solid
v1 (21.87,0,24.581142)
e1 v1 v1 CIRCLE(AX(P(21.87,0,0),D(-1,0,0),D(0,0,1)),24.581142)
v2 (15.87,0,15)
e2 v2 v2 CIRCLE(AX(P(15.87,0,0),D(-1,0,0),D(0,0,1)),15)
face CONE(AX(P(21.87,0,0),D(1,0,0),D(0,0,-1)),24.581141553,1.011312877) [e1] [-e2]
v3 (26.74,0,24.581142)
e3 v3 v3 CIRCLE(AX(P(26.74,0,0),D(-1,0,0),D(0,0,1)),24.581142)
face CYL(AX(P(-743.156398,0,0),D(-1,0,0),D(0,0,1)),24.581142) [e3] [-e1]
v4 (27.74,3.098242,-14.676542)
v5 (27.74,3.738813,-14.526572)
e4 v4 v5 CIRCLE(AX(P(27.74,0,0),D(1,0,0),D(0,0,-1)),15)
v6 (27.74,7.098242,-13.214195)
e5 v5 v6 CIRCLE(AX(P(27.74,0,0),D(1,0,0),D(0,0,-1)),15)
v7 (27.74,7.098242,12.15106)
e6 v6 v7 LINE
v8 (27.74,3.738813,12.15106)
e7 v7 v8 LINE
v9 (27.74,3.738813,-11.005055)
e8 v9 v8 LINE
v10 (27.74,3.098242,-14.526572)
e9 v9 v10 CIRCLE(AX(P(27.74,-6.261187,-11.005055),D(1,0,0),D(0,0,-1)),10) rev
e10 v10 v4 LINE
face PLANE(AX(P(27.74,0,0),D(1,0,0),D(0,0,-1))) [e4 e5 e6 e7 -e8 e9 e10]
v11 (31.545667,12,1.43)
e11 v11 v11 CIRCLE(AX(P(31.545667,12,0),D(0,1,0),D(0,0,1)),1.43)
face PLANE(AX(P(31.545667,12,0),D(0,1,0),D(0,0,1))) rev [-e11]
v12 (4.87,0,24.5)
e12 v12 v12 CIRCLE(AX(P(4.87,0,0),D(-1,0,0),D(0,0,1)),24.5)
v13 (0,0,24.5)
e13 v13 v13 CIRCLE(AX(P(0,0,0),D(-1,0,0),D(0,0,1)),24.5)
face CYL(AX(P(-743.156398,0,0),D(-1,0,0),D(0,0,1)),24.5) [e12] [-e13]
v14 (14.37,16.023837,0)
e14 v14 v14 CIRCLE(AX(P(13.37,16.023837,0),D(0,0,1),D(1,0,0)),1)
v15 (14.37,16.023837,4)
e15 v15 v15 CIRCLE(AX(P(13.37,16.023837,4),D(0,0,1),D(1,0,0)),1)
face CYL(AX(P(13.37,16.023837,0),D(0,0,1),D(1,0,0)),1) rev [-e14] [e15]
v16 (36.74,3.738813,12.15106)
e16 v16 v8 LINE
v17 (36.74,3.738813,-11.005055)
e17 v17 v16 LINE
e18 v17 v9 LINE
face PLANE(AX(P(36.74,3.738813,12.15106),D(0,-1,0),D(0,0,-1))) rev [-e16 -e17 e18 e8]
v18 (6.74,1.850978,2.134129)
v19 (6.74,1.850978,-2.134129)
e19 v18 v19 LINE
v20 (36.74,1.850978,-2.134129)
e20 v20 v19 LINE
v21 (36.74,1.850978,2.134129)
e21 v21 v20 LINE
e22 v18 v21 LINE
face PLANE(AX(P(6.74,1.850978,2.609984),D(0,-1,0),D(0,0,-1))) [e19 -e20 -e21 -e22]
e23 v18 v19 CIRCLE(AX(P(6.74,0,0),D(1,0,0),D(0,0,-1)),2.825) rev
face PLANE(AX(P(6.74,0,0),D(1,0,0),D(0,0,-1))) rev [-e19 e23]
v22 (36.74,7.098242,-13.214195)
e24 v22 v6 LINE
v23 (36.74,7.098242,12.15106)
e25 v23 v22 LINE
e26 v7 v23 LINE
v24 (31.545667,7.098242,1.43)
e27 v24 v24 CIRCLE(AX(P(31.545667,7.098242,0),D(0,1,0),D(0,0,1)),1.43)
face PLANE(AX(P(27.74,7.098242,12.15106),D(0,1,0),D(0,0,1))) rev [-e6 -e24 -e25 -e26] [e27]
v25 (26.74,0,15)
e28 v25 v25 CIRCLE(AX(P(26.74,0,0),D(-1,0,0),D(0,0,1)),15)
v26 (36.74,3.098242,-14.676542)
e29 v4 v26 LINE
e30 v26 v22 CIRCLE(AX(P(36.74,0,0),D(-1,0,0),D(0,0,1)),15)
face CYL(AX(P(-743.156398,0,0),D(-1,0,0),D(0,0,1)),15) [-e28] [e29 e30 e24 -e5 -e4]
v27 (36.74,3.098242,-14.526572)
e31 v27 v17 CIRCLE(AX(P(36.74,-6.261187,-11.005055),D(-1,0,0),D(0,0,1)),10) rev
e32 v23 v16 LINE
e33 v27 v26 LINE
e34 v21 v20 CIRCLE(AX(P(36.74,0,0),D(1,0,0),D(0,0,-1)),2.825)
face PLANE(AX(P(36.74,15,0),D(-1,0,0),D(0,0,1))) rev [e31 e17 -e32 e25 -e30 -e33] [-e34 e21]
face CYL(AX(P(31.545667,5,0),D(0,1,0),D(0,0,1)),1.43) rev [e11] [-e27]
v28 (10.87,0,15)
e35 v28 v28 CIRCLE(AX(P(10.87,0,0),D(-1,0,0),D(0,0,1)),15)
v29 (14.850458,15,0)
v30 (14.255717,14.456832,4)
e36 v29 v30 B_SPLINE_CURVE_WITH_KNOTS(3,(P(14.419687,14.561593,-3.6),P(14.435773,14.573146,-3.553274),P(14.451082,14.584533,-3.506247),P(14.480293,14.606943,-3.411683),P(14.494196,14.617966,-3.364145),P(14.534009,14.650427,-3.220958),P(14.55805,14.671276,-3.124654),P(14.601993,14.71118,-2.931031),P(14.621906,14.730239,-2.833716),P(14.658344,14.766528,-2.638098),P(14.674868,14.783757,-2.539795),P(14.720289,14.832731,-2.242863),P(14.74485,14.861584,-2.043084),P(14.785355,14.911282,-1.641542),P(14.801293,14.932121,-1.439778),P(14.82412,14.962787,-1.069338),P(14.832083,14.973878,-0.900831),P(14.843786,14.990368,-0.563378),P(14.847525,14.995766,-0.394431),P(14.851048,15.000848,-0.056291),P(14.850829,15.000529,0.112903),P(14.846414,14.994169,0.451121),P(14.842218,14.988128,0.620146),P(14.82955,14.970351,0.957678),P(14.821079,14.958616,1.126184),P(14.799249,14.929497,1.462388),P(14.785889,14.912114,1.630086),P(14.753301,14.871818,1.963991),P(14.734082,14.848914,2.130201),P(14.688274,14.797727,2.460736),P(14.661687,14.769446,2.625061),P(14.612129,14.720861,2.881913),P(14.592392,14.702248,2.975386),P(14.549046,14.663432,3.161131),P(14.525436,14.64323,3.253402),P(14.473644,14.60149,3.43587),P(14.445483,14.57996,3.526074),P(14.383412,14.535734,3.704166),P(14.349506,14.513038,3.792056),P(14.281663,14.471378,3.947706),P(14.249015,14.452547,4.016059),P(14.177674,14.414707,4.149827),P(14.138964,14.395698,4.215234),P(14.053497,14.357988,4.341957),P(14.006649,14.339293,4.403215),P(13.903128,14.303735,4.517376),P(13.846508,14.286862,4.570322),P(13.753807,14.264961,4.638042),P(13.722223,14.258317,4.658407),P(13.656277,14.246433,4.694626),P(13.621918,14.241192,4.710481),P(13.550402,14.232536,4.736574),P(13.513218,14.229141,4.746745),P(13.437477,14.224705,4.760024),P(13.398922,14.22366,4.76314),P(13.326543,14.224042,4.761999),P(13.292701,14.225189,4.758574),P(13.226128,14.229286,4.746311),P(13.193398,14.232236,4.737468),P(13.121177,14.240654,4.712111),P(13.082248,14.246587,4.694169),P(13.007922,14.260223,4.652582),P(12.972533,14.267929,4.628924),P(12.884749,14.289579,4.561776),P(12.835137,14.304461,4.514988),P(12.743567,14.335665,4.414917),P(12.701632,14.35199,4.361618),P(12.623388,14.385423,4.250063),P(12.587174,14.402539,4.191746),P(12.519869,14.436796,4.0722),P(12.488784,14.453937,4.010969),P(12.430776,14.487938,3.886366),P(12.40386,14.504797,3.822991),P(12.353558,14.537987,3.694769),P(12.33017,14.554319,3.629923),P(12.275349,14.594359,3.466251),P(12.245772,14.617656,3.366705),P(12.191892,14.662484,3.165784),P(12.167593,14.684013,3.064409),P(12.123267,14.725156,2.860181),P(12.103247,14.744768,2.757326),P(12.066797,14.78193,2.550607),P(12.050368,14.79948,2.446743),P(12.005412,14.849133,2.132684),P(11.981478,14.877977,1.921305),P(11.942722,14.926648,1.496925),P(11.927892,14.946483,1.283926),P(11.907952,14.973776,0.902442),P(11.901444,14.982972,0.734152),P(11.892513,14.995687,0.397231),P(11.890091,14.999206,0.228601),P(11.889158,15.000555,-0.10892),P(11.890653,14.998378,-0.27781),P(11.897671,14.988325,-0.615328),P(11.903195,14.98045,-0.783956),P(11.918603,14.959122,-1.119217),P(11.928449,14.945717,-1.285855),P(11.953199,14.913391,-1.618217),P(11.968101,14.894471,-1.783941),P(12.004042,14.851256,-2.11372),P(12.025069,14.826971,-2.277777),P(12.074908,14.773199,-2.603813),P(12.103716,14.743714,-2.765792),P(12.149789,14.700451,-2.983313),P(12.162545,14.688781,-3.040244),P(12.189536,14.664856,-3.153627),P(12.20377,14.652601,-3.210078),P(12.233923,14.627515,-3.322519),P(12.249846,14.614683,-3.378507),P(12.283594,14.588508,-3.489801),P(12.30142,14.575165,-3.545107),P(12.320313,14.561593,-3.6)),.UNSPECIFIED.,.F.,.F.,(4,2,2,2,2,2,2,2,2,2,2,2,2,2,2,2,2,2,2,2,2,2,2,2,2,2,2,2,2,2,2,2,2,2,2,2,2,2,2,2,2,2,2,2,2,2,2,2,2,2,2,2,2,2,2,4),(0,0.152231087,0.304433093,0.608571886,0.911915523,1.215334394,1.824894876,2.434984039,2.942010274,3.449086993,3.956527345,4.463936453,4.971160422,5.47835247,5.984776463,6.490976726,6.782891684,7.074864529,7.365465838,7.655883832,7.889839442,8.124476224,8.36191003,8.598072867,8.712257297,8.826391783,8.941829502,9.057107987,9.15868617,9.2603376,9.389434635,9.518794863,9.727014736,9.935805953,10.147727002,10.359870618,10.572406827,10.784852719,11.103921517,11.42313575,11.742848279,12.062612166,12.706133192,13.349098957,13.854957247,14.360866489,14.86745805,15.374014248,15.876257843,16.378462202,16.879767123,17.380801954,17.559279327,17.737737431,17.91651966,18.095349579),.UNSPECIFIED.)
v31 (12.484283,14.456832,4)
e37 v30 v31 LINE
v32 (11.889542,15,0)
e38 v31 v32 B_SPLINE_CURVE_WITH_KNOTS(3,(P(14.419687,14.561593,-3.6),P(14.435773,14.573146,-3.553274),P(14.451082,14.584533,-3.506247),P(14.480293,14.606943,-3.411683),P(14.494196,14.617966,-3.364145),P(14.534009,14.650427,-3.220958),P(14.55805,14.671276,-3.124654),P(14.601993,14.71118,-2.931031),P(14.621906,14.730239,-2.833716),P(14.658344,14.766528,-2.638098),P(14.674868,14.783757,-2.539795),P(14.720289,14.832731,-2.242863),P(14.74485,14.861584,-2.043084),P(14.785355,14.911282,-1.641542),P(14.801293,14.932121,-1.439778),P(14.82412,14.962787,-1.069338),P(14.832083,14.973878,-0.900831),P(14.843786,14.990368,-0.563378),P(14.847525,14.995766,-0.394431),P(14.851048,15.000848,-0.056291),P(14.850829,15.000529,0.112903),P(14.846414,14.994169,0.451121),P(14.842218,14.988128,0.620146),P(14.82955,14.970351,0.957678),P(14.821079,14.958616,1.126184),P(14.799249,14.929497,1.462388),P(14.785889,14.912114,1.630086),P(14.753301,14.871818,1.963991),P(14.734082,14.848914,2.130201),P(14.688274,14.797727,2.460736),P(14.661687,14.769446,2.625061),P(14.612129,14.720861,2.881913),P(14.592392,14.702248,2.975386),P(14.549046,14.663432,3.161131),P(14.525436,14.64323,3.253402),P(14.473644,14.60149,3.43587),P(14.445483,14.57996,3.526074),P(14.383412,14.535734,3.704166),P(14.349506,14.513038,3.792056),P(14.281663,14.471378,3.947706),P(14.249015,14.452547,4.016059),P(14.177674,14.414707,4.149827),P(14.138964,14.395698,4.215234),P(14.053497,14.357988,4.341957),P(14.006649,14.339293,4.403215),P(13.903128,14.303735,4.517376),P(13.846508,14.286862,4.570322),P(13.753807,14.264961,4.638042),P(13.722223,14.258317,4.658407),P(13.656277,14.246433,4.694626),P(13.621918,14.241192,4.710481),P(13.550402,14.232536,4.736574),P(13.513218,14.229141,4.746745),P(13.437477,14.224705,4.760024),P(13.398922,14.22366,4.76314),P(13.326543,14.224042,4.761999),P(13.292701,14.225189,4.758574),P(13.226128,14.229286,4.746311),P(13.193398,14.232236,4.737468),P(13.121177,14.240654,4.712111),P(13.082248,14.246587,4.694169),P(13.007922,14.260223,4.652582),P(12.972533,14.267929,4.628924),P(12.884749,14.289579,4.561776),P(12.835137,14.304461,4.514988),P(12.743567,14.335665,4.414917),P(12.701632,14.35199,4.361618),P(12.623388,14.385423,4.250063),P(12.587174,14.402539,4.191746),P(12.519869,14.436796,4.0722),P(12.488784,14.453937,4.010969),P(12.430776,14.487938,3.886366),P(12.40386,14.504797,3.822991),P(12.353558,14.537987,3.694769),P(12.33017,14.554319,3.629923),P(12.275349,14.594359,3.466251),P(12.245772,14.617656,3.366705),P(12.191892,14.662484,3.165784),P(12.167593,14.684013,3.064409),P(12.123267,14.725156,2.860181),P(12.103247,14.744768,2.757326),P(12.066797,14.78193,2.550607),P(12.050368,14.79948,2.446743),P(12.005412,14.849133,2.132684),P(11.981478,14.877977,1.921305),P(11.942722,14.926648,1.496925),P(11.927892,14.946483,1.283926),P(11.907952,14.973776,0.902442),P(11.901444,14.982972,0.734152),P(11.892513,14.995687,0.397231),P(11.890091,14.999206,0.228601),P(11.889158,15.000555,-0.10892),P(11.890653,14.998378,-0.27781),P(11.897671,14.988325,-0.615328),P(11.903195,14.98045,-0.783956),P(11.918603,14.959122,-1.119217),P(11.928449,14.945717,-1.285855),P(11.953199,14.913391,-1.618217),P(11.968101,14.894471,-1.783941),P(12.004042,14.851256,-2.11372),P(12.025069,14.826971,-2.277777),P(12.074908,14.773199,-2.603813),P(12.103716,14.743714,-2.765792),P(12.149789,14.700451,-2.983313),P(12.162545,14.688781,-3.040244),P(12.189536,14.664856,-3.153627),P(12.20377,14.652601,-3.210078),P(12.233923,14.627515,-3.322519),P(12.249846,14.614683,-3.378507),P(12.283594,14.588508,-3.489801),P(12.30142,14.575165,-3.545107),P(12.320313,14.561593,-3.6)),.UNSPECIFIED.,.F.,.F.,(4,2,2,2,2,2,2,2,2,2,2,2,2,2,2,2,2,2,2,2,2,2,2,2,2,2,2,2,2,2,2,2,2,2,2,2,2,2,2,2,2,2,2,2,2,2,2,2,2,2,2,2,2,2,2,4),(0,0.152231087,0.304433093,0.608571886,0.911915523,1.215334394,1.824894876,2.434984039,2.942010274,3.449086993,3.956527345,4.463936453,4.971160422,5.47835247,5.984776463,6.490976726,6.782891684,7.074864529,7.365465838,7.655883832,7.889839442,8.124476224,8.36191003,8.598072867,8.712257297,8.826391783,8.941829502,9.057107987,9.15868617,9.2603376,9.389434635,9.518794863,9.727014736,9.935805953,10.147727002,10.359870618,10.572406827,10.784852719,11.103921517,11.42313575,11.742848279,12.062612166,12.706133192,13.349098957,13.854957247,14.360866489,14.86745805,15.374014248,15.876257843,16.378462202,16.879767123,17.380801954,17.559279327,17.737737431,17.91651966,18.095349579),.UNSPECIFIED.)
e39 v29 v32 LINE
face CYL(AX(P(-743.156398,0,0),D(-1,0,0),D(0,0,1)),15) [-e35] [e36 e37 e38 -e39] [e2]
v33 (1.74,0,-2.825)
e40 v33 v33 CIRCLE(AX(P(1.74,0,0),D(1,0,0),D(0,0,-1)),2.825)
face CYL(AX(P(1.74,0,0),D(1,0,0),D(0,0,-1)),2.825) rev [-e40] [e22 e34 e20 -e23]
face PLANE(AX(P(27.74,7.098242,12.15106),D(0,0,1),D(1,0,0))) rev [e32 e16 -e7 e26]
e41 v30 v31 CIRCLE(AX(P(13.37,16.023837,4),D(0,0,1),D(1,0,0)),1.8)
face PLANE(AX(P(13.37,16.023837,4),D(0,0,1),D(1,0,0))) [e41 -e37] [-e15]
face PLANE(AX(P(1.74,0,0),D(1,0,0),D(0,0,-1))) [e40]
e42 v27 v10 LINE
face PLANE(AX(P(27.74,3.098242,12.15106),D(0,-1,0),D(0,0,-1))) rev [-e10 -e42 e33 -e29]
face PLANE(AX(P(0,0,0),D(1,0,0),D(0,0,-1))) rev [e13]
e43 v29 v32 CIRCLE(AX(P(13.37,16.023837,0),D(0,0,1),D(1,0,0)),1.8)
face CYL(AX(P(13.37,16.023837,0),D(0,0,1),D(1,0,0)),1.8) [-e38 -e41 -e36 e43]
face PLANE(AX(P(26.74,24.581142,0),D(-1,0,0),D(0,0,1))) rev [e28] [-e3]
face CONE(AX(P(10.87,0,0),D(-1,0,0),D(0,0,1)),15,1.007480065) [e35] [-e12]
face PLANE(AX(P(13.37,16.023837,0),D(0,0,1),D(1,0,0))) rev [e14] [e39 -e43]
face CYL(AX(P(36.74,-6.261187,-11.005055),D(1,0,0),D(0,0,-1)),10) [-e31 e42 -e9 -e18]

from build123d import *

# Parameters (mm, degrees)
SKETCH_3_R           = 2.825
CUT_EXTRUDE_2_DEPTH  = 35
SKETCH_16_W          = 5.008881277
SKETCH_16_H          = 1
EXTRUDE_2_DEPTH      = 30
SKETCH_19_W          = 0.959066555
SKETCH_19_H          = 0.511502163
EXTRUDE_3_DEPTH      = 30
SKETCH_24_W          = 26.827602514
SKETCH_24_H          = 4
CUT_EXTRUDE_8_DEPTH  = 9
EXTRUDE_1_DEPTH      = 2
EXTRUDE_1_DEPTH_BACK = 2
SKETCH_26_R          = 1.8
SKETCH_26_R_2        = 1
SKETCH_27_R          = 1.43
CUT_EXTRUDE_9_DEPTH  = 7
SKETCH_28_W          = 26.67763166
SKETCH_28_H          = 0.640570548
EXTRUDE_4_DEPTH      = 9
FILLET_1_R           = 10


with BuildPart() as part:
    # 草圖1 → 旋轉1 (revolve)
    with BuildSketch(Plane.XY, mode=Mode.PRIVATE) as revolve_1_sk:
        Polygon((0, 0), (0, 24.5), (4.87, 24.5), (10.87, 15), (15.87, 15), (21.87, 24.581141553), (26.74, 24.581141553), (26.74, 15), (36.74, 15), (36.74, 0), align=None)
    revolve(revolve_1_sk.sketch.rotate(Axis((-743.15639781, 0, 0), (1, 0, 0)), 90), axis=Axis((-743.15639781, 0, 0), (1, 0, 0)))

    # 草圖3 → 除料-伸長2 (cut)
    with BuildSketch(Plane(origin=(36.74, 0, 0), x_dir=(0, 0, -1), z_dir=(1, 0, 0))):
        Circle(SKETCH_3_R)
    extrude(amount=-CUT_EXTRUDE_2_DEPTH, mode=Mode.SUBTRACT)

    # 草圖16 → 填料-伸長2 (add)
    with BuildSketch(Plane(origin=(36.74, 0, 0), x_dir=(0, 0, -1), z_dir=(1, 0, 0))):
        with Locations((-0.105543204, 2.350977924)):
            Rectangle(SKETCH_16_W, SKETCH_16_H)
    extrude(amount=-EXTRUDE_2_DEPTH)

    # 草圖19 → 填料-伸長3 (add)
    with BuildSketch(Plane(origin=(36.74, 0, 0), x_dir=(0, 0, -1), z_dir=(1, 0, 0))):
        with Locations((-0.084116996, 2.673942601)):
            Rectangle(SKETCH_19_W, SKETCH_19_H)
    extrude(amount=-EXTRUDE_3_DEPTH)

    # 草圖24 → 除料-伸長8 (cut)
    with BuildSketch(Plane(origin=(36.74, 0, 0), x_dir=(0, 0, -1), z_dir=(1, 0, 0))):
        with Locations((1.262741112, 5.098242099)):
            Rectangle(SKETCH_24_W, SKETCH_24_H)
    extrude(amount=-CUT_EXTRUDE_8_DEPTH, mode=Mode.SUBTRACT)

    # 草圖26 → 伸長-薄件1 (add, two sides: drawn at the far end of the back side and taken through both)
    with BuildSketch(Plane.XY.offset(2).offset(-EXTRUDE_1_DEPTH_BACK)):
        with Locations((13.37, 16.023837481)):
            Circle(SKETCH_26_R)
        with Locations((13.37, 16.023837481)):
            Circle(SKETCH_26_R_2, mode=Mode.SUBTRACT)
    extrude(amount=EXTRUDE_1_DEPTH + EXTRUDE_1_DEPTH_BACK)

    # 草圖27 → 除料-伸長9 (cut)
    with BuildSketch(Plane(origin=(0, 12, 0), x_dir=(1, 0, 0), z_dir=(0, 1, 0))):
        with Locations(Location((31.545667046, 0, 0), (0, 0, 270))):
            Circle(SKETCH_27_R)
    extrude(amount=-CUT_EXTRUDE_9_DEPTH, mode=Mode.SUBTRACT)

    # 草圖28 → 填料-伸長4 (add)
    with BuildSketch(Plane(origin=(27.74, 0, 0), x_dir=(0, 0, -1), z_dir=(1, 0, 0))):
        with Locations((1.187755685, 3.418527373)):
            Rectangle(SKETCH_28_W, SKETCH_28_H)
    extrude(amount=EXTRUDE_4_DEPTH)

    # 圓角1
    # the kernel refuses this fillet: 10 mm, written as the material it takes off along each edge
    with BuildSketch(Plane(origin=(27.74, 3.738812647, -14.526571515), x_dir=(0, -1, 0), z_dir=(1, 0, 0))) as fillet_1_piece_1:
        with BuildLine():
            CenterArc((10, -3.521516765), FILLET_1_R, 159.381022137, 20.618977863)
            Line((0, -3.521516765), (-0.2, -3.521516765))
            Line((-0.2, -3.521516765), (-0.2, 0))
            Line((-0.2, 0), (0, 0.2))
            ThreePointArc((0, 0.2), (0.320285274, 0.2), (0.453381959, 0.070430335))
            Line((0.453381959, 0.070430335), (0.640570548, 0))
        make_face()
    extrude(amount=17.803791913, mode=Mode.SUBTRACT)


solid = part.part
